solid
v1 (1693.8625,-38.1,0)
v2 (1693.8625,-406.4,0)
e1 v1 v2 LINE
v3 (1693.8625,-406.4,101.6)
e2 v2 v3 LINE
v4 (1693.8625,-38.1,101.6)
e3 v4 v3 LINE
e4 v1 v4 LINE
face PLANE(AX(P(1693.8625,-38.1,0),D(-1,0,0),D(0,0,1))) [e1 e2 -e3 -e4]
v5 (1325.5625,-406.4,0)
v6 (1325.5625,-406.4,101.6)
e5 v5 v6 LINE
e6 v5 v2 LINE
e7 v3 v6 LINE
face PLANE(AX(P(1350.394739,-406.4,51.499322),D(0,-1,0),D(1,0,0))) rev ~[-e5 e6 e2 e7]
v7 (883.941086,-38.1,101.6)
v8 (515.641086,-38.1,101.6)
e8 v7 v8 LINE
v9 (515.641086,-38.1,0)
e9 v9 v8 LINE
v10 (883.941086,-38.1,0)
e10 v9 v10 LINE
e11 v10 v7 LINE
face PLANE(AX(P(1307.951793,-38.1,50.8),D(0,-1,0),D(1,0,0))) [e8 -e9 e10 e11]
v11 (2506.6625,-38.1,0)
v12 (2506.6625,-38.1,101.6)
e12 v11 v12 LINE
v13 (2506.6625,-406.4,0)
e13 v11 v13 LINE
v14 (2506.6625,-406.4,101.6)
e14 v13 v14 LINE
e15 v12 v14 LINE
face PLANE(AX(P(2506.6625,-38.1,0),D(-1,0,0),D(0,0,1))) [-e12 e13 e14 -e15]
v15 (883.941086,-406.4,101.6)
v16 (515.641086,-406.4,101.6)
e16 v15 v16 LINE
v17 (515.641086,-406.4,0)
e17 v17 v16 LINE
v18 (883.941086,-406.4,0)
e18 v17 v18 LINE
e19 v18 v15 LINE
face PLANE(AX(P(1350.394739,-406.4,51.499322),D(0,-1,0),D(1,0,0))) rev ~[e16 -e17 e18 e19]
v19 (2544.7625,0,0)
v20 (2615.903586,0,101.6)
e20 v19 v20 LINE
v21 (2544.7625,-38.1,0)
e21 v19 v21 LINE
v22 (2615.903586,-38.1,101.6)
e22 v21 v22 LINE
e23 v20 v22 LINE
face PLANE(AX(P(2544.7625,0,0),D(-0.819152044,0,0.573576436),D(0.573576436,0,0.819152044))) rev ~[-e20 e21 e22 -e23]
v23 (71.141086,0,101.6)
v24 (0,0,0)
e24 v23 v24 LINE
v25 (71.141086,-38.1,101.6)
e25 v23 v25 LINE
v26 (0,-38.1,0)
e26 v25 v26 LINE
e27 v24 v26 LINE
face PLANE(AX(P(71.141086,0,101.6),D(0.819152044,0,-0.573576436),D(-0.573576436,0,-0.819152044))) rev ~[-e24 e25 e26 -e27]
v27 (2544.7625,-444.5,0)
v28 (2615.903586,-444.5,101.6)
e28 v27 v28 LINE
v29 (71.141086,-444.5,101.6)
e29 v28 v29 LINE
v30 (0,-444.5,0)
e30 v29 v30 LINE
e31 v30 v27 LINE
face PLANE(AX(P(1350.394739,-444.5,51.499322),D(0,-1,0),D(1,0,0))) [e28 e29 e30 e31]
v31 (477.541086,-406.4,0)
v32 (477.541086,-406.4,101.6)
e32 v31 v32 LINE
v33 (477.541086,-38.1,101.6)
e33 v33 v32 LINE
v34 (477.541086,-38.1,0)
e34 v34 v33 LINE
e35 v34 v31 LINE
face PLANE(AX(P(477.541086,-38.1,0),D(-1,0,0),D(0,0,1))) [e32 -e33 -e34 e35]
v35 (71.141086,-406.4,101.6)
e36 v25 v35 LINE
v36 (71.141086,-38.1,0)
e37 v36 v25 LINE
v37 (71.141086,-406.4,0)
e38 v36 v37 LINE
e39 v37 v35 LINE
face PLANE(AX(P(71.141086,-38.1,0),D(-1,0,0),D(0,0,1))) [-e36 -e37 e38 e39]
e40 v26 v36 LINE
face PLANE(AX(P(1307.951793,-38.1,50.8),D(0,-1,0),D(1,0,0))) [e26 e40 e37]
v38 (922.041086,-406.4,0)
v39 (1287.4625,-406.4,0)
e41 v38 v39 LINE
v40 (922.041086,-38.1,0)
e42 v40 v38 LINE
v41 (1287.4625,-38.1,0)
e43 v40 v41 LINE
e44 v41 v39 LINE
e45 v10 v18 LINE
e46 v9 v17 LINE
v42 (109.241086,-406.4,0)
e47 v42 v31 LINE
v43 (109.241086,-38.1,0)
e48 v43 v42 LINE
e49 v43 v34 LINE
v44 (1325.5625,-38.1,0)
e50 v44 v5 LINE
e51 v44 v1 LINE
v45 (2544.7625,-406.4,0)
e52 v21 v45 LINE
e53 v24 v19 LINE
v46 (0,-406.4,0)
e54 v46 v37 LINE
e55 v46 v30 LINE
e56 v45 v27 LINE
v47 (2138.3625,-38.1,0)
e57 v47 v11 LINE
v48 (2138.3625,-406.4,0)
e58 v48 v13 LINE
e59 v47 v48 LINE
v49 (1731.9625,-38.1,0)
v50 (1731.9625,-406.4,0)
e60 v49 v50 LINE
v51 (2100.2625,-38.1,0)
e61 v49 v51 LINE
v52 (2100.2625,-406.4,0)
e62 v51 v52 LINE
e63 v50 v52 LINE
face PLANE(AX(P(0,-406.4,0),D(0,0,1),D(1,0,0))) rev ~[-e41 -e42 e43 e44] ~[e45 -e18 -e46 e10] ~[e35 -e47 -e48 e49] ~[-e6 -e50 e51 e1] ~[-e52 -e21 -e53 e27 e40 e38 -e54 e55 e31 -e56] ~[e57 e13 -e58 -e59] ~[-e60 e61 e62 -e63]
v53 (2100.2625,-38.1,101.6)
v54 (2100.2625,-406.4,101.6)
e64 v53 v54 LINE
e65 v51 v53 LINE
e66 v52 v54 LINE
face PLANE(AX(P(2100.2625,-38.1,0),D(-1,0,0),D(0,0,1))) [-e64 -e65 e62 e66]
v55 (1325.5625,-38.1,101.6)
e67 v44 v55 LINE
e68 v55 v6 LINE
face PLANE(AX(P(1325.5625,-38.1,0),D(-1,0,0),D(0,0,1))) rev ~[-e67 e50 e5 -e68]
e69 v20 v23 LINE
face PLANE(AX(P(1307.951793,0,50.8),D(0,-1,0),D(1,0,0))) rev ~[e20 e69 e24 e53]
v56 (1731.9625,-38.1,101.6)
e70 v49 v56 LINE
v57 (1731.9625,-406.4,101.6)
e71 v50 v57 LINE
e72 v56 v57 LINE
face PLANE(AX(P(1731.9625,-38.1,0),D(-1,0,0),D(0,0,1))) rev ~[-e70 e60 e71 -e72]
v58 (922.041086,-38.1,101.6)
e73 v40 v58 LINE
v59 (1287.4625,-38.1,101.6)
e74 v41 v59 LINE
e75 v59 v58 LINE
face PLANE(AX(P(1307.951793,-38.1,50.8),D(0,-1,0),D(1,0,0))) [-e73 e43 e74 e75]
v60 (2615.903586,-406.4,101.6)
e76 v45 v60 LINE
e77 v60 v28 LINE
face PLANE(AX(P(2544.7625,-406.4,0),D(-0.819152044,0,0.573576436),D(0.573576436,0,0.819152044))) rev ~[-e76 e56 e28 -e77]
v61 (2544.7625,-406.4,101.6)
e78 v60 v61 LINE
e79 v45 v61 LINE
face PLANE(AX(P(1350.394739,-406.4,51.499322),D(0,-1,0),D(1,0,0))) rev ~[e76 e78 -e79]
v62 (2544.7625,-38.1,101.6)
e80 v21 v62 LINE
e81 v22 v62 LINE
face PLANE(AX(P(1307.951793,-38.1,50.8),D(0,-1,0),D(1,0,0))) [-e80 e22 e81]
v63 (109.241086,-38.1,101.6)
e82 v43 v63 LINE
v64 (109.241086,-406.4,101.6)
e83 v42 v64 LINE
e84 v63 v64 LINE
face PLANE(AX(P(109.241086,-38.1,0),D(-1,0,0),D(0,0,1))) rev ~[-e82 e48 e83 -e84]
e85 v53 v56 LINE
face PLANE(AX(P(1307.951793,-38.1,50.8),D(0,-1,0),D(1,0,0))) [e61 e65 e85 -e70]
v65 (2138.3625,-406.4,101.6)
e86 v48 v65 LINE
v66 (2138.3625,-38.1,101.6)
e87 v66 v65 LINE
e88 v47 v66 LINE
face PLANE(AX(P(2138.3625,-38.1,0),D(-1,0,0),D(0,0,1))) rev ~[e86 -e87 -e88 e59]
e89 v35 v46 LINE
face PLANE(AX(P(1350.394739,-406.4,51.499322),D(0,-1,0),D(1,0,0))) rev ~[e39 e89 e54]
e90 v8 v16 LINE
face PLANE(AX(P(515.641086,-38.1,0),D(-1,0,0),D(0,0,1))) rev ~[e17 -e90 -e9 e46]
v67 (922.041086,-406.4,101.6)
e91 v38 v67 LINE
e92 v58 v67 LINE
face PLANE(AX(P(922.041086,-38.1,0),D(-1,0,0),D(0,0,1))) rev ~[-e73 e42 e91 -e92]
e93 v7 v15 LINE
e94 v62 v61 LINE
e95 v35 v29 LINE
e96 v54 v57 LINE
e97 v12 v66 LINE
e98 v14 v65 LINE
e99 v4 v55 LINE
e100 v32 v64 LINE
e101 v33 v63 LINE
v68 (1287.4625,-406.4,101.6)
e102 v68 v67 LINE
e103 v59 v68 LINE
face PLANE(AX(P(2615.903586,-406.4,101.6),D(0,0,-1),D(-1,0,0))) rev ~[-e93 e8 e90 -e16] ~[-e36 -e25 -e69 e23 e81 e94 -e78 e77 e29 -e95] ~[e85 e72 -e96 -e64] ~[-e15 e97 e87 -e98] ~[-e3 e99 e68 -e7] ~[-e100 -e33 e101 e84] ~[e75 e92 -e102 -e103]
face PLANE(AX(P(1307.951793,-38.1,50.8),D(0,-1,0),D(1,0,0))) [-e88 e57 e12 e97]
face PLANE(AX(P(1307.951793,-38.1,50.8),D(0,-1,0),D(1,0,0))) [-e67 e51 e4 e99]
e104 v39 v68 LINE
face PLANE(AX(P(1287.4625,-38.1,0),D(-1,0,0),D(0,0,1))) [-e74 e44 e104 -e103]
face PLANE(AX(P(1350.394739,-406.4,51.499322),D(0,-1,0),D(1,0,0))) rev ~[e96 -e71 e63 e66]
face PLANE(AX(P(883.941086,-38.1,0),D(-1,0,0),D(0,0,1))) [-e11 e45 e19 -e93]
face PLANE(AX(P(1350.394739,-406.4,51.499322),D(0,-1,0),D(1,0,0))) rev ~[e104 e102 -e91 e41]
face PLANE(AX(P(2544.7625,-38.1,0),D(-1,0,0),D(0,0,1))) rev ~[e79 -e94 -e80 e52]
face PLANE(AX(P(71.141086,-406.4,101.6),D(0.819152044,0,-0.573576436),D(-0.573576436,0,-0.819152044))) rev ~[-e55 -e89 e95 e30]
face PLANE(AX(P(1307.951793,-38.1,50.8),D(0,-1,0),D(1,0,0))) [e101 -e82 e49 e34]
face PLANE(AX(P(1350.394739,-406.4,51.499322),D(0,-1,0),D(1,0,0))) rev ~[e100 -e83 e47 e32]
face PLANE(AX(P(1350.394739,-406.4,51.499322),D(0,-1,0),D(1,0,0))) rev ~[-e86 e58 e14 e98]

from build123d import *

# Parameters (mm, degrees)
F1_DEPTH = 38.1
F2_W     = 38.1
F2_H     = 101.6
F3_DEPTH = 368.3
F4_W     = 38.1
F4_H     = 101.6
F5_DEPTH = 38.1


# Not quite as in the source:
# - a feature names something its author has since deleted; it is built from what else it names


with BuildPart() as f1:
    # F0 (on Front) → F1 (new body)
    with BuildSketch(Plane.XZ):
        Polygon((71.1410858821, 101.6), (0, 0), (2544.7625, 0), (2615.9035858821, 101.6), align=None)
    extrude(amount=F1_DEPTH)

    # F2 (on face) → F3 (join)
    with BuildSketch(Plane.XZ.offset(38.1)):
        with Locations((90.1910858821, 50.8)):
            Rectangle(F2_W, F2_H)
        with Locations((496.5910858821, 50.8)):
            Rectangle(F2_W, F2_H)
        with Locations((902.9910858821, 50.8)):
            Rectangle(F2_W, F2_H)
        with Locations((1306.5125, 50.8)):
            Rectangle(F2_W, F2_H)
        with Locations((1712.9125, 50.8)):
            Rectangle(F2_W, F2_H)
        with Locations((2119.3125, 50.8)):
            Rectangle(F2_W, F2_H)
        with Locations((2525.7125, 50.8)):
            Rectangle(F2_W, F2_H)
    extrude(amount=F3_DEPTH)

    # F4 (on face) → F5 (join)
    with BuildSketch(Plane.XZ.offset(406.4)):
        Polygon((2615.9035858821, 101.6), (109.2410858821, 101.6), (109.2410858821, 0), (2544.7625, 0), align=None)
        with Locations((90.1910858821, 50.8)):
            Rectangle(F4_W, F4_H)
        Polygon((71.1410858821, 101.6), (0, 0), (71.1410858821, 0), align=None)
    extrude(amount=F5_DEPTH)


solid = f1.part
